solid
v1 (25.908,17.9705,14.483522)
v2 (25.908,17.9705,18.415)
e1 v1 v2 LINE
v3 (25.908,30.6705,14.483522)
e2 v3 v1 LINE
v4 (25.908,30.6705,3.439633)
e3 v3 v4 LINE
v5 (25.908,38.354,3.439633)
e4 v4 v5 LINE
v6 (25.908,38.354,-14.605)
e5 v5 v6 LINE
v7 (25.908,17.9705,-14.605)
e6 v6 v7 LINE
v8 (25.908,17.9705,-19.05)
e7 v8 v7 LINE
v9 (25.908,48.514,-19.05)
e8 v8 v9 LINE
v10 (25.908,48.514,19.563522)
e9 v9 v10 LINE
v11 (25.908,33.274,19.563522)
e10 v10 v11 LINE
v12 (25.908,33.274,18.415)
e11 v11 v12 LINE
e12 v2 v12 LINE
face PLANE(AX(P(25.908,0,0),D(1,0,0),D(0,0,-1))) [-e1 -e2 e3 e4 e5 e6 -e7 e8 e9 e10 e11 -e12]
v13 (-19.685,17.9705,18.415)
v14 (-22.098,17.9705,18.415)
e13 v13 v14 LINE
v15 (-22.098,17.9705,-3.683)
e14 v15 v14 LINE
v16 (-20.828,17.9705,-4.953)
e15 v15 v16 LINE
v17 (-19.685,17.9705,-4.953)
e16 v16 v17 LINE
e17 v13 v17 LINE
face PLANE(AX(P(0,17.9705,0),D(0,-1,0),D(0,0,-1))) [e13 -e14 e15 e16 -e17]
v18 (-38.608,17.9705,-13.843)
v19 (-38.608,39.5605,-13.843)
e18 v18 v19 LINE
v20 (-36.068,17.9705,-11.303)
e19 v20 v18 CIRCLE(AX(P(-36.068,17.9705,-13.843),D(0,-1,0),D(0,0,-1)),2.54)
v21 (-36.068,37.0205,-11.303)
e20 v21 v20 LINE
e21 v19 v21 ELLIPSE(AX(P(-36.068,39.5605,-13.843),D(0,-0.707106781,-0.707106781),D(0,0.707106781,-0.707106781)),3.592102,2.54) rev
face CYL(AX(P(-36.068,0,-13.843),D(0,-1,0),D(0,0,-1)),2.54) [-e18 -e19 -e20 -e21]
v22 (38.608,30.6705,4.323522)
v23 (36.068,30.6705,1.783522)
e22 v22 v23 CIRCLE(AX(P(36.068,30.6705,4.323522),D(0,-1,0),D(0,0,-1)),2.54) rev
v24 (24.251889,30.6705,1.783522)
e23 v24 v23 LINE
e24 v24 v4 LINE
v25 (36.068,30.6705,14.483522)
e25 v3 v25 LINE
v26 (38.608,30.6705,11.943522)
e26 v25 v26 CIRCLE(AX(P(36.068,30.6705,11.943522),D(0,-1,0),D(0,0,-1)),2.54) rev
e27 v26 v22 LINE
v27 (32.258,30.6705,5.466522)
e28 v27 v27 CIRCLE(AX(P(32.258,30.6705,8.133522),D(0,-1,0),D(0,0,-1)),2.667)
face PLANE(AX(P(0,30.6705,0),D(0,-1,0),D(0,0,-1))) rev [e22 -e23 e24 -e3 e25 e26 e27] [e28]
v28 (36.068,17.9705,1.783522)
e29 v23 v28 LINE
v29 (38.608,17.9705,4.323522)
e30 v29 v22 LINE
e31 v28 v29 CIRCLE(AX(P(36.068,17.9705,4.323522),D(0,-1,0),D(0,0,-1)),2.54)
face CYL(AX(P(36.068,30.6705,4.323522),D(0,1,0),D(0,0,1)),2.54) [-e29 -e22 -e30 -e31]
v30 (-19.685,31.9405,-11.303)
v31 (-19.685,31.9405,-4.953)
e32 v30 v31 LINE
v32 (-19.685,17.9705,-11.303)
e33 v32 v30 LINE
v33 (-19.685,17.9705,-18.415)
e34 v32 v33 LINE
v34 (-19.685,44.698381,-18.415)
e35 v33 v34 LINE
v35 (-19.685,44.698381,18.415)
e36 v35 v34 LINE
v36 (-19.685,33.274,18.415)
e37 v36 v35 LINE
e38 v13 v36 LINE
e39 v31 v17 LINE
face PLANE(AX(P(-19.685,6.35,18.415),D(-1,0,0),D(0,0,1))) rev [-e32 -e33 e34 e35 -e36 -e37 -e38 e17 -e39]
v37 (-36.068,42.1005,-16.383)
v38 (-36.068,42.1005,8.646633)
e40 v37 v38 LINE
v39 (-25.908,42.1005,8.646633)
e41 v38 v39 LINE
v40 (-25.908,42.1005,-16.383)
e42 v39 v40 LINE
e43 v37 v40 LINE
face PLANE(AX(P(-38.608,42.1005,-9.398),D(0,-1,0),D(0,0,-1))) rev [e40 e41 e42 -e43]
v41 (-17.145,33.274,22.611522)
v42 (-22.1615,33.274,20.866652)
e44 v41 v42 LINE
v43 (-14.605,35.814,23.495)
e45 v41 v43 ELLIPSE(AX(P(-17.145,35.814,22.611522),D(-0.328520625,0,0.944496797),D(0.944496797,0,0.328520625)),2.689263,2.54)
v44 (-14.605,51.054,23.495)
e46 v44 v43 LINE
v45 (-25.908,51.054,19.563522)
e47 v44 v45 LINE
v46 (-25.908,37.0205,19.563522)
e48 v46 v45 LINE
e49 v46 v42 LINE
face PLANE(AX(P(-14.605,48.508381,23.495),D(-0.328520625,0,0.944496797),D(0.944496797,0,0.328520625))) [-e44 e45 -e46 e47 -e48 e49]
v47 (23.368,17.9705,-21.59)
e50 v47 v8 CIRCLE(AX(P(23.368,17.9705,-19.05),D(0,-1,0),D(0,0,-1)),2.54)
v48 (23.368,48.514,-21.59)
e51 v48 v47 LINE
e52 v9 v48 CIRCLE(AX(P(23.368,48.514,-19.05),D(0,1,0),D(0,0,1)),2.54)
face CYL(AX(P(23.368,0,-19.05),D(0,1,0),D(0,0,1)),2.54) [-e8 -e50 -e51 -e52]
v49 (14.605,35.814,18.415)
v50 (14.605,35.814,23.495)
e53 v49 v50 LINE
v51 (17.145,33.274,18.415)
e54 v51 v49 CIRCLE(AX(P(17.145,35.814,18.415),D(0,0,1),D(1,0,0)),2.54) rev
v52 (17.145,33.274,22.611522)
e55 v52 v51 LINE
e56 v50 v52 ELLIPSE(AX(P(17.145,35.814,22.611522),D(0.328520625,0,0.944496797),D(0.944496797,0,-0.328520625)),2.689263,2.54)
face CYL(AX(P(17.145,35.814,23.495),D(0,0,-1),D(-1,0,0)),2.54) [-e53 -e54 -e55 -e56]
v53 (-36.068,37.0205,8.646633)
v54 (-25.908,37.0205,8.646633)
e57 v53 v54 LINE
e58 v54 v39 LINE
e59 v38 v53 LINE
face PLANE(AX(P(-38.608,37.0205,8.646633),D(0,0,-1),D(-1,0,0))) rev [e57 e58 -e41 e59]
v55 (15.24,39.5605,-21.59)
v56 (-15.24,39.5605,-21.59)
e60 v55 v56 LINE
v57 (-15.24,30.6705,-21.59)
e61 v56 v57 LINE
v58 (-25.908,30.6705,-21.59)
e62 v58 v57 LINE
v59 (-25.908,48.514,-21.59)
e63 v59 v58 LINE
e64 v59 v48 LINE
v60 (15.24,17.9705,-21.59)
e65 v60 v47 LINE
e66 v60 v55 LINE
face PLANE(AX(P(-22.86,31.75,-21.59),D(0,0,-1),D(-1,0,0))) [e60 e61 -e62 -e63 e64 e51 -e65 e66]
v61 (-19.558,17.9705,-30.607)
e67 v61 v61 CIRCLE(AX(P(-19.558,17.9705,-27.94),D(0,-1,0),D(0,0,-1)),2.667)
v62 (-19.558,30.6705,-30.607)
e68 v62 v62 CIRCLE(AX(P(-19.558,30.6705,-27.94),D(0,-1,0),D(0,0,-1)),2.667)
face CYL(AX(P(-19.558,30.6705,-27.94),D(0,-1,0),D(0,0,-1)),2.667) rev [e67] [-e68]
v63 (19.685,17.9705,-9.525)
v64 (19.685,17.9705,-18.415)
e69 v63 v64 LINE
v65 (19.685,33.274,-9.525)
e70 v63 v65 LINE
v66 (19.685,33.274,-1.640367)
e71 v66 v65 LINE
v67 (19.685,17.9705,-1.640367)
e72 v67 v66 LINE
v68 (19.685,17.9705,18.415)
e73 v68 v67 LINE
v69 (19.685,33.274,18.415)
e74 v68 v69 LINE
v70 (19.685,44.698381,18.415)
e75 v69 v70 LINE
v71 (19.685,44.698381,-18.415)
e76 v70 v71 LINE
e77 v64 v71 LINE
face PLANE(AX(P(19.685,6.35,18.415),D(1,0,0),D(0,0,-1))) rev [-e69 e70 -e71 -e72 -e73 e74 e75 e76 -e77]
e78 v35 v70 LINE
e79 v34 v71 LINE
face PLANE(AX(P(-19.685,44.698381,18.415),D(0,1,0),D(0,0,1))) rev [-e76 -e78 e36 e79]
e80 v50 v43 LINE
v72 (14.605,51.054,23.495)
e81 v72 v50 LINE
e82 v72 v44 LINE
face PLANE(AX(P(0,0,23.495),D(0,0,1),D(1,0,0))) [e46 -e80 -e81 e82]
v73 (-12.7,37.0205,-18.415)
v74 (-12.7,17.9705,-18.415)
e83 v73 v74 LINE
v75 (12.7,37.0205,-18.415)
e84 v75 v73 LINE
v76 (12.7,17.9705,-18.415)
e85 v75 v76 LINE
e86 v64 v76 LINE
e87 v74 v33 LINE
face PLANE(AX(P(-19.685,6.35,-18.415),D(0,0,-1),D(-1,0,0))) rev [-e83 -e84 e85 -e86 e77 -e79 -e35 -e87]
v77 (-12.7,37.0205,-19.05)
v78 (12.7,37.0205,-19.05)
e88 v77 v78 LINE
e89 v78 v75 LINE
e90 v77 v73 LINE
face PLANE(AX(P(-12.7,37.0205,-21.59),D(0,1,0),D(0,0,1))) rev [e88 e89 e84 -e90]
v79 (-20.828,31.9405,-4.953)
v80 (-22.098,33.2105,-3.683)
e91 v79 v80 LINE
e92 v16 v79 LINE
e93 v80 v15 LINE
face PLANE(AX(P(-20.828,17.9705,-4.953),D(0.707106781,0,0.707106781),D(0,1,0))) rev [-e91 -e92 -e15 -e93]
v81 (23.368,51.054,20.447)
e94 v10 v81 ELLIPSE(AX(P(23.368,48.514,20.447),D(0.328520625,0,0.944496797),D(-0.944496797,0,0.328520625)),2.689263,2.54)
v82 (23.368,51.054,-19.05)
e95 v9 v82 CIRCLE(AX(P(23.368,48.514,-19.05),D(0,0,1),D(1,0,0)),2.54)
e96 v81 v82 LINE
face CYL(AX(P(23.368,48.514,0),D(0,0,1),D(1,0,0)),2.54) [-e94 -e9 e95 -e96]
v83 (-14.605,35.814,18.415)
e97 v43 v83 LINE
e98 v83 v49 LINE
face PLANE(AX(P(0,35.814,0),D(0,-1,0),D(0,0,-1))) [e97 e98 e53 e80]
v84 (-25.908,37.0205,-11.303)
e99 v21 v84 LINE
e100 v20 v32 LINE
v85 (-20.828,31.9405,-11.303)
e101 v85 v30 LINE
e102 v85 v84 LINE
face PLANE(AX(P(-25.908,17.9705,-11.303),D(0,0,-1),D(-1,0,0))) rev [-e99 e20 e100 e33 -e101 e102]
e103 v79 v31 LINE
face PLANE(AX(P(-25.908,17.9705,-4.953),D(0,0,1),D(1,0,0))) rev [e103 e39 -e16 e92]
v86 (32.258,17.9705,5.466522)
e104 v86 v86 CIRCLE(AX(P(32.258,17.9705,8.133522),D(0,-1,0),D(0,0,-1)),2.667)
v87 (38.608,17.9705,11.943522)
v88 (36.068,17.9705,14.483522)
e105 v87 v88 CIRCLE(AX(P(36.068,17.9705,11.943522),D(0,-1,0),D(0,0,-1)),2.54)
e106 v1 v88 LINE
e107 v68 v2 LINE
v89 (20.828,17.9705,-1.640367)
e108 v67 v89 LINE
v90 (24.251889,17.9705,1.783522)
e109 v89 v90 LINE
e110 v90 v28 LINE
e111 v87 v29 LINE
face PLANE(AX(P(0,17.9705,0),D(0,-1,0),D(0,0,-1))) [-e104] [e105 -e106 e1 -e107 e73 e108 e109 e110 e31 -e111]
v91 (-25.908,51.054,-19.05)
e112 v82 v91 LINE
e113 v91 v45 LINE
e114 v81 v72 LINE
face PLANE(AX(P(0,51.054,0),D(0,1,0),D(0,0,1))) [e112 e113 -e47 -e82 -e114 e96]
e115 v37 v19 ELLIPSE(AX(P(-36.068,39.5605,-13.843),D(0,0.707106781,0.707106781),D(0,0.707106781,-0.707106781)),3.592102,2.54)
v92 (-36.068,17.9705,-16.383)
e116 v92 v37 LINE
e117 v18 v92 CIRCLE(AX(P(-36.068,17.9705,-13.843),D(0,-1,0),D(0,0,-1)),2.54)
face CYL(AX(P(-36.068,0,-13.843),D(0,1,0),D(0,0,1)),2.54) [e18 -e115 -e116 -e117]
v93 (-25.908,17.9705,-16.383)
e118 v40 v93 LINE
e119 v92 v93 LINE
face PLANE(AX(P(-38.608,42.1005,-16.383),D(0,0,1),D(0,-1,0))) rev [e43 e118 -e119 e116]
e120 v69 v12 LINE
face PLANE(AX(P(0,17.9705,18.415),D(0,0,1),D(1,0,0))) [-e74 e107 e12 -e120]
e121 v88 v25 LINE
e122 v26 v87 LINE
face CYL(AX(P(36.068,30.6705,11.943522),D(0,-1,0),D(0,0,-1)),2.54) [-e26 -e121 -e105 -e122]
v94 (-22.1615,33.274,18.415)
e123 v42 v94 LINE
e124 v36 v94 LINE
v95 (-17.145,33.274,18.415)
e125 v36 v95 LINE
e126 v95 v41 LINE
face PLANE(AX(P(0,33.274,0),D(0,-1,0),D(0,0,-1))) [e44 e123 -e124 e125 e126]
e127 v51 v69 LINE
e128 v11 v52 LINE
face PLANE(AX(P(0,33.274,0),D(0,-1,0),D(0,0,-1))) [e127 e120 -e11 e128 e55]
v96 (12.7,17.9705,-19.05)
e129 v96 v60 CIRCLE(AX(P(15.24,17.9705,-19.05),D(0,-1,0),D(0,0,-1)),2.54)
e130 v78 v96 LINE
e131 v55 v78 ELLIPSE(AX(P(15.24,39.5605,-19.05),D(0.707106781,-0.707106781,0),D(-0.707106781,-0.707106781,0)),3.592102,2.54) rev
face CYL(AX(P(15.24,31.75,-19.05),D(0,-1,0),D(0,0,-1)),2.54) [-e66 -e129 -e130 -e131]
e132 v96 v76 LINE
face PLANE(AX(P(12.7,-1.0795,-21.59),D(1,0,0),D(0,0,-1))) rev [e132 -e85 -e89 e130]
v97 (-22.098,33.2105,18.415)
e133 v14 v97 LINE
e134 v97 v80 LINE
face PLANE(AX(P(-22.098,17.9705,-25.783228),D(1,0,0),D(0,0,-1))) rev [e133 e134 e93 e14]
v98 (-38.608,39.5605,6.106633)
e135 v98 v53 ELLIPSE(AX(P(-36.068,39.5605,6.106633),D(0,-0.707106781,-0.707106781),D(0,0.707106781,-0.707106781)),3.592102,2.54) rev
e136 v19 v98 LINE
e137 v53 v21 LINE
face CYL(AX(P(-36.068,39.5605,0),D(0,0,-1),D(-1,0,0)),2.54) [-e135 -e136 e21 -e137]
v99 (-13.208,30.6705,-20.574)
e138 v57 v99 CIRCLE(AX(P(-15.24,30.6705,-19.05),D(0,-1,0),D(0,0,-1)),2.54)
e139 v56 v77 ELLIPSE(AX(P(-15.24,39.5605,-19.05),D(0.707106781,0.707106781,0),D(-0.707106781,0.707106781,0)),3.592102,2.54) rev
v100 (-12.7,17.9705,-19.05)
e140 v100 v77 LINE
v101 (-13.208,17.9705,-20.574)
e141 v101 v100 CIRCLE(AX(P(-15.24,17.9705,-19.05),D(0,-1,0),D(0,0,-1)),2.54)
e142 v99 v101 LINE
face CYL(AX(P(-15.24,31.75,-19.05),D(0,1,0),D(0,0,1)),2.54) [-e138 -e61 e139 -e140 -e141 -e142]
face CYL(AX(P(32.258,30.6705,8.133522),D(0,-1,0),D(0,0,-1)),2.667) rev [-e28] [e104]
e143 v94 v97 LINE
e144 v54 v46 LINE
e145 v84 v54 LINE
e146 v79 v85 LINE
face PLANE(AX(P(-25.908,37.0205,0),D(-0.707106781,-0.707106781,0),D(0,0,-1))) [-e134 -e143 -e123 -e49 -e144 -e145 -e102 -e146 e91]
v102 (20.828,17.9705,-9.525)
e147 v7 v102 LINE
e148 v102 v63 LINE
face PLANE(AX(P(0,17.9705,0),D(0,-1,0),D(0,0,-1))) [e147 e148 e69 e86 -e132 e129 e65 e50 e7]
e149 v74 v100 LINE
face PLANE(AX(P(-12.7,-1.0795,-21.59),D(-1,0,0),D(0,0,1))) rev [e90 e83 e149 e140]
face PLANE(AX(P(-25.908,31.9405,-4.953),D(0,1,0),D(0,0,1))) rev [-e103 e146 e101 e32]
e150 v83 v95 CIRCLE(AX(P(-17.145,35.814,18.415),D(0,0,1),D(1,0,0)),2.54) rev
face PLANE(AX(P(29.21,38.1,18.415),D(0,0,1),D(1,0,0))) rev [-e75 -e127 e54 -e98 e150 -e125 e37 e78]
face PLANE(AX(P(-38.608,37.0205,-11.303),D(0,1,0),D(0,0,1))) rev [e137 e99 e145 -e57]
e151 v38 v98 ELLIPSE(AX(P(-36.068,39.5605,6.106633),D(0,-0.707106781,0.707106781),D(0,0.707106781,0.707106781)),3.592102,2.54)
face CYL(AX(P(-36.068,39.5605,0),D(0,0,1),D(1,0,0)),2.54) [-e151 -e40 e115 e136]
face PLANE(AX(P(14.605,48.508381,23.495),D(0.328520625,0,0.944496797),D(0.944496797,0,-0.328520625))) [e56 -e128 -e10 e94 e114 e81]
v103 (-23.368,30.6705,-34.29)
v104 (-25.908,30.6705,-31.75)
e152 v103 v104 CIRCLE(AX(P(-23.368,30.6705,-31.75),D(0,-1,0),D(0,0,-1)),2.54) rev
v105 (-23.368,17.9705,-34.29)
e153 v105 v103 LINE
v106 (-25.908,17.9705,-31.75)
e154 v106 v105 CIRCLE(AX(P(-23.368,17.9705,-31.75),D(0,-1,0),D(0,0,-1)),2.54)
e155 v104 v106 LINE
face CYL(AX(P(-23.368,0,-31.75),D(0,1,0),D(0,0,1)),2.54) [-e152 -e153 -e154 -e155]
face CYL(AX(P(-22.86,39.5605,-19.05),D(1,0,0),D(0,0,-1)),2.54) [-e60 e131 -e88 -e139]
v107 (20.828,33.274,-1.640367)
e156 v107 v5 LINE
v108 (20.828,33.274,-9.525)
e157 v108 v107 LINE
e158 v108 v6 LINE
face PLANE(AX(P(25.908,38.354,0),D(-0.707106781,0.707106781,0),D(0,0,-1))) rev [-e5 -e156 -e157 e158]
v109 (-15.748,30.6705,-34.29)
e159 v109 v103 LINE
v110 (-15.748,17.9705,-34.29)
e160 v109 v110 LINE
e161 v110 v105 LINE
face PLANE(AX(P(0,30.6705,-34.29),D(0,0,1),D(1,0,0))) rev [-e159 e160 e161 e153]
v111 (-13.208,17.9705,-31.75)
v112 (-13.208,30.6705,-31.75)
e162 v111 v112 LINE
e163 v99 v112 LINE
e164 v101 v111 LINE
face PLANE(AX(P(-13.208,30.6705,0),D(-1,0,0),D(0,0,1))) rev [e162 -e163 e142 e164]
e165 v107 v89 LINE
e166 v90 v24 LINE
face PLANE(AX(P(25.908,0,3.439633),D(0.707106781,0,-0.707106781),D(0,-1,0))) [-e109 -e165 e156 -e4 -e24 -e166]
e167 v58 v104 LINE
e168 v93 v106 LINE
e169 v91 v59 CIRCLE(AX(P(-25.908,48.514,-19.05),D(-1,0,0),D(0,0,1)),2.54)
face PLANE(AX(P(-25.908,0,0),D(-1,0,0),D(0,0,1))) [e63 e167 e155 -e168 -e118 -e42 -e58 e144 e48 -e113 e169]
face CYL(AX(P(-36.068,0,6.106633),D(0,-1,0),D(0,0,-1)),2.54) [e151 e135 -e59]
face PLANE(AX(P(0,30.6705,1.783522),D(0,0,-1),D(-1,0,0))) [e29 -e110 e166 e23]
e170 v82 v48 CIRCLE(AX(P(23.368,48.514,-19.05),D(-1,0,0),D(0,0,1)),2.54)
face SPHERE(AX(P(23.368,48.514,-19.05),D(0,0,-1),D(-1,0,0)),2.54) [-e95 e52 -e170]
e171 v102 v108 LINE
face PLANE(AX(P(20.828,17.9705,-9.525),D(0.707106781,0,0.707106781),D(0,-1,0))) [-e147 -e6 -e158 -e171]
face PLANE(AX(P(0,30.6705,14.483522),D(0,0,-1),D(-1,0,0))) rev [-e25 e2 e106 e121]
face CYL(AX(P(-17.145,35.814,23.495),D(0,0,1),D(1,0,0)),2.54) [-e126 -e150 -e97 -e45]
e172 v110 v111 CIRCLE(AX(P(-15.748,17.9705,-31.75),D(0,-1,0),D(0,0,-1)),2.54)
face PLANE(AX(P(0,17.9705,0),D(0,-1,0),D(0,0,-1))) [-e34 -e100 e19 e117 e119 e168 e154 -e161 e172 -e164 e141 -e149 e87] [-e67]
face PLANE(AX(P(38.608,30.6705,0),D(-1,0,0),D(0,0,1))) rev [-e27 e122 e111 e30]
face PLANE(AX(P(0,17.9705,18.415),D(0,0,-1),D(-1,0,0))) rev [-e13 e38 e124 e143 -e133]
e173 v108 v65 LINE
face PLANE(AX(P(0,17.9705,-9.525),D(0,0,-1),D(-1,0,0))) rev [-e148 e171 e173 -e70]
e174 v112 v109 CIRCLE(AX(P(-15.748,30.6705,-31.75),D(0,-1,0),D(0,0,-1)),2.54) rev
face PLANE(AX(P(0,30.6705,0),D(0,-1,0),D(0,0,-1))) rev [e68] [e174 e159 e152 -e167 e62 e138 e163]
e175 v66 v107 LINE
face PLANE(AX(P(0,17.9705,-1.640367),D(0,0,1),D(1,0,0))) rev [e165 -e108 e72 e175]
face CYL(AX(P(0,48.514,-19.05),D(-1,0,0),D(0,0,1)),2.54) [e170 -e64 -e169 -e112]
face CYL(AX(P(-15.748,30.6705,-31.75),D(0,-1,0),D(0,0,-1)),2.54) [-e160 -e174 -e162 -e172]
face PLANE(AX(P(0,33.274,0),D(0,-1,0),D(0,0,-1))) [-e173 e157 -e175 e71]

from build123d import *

# Parameters (mm, degrees)
SKETCH1_W            = 45.72
SKETCH1_H            = 43.18
BOSS_EXTRUDE1_DEPTH  = 31.75
SKETCH2_W            = 39.37
SKETCH2_H            = 36.83
CUT_EXTRUDE3_DEPTH   = 25.4
SKETCH3_W            = 45.72
SKETCH3_H            = 31.75
CUT_EXTRUDE5_DEPTH   = 3.175
BOSS_EXTRUDE4_DEPTH  = 38.1
SKETCH7_W            = 39.37
SKETCH7_H            = 25.151618727
BOSS_EXTRUDE5_DEPTH  = 36.83
SKETCH8_W            = 40.005
SKETCH8_H            = 69.85
BOSS_EXTRUDE6_DEPTH  = 6.35
SKETCH9_W            = 40.005
SKETCH9_H            = 69.85
BOSS_EXTRUDE7_DEPTH  = 6.35
CUT_EXTRUDE8_DEPTH   = 61.468
SKETCH13_W           = 58.42
SKETCH13_H           = 26.3525
BOSS_EXTRUDE8_DEPTH  = 16.002
CUT_EXTRUDE9_DEPTH   = 16.51
SKETCH15_W           = 37.994827887
SKETCH15_H           = 16.002
BOSS_EXTRUDE9_DEPTH  = 5.08
SKETCH16_W           = 58.42
SKETCH16_H           = 40.005
CUT_EXTRUDE11_DEPTH  = 38.1
SKETCH17_W           = 9.525
SKETCH17_H           = 12.7
BOSS_EXTRUDE10_DEPTH = 13.97
SKETCH18_W           = 9.525
SKETCH18_H           = 12.7
BOSS_EXTRUDE11_DEPTH = 13.97
SKETCH19_W           = 39.37
SKETCH19_H           = 3.81
BOSS_EXTRUDE14_DEPTH = 5.08
CUT_EXTRUDE12_DEPTH  = 3.81
BOSS_EXTRUDE22_DEPTH = 3.809999
BOSS_EXTRUDE23_START = -1e-06
BOSS_EXTRUDE23_DEPTH = 21.34162
BOSS_EXTRUDE24_DEPTH = 6.598381
SKETCH40_W           = 39.37
SKETCH40_H           = 36.83
BOSS_EXTRUDE25_DEPTH = 4.826
SKETCH42_W           = 37.994827887
SKETCH42_H           = 16.002
BOSS_EXTRUDE26_DEPTH = 3.302
SKETCH43_W           = 39.37
SKETCH43_H           = 13.582012484
CUT_EXTRUDE13_DEPTH  = 6.35
SKETCH45_W           = 39.37
SKETCH45_H           = 13.582012484
BOSS_EXTRUDE27_DEPTH = 19.05
CUT_EXTRUDE15_DEPTH  = 3.302
CUT_EXTRUDE16_DEPTH  = 3.302
SKETCH48_W           = 3.302
SKETCH48_H           = 36.576
CUT_EXTRUDE17_DEPTH  = 3.302
SKETCH49_W           = 3.302
SKETCH49_H           = 36.576
CUT_EXTRUDE18_DEPTH  = 3.302
SKETCH50_W           = 63.22676162
SKETCH50_H           = 45.986337428
CUT_EXTRUDE19_DEPTH  = 16.002
SKETCH51_W           = 54.973573954
SKETCH51_H           = 46.584394505
CUT_EXTRUDE20_DEPTH  = 18.796
SKETCH52_W           = 6.223
SKETCH52_H           = 20.055366997
SKETCH52_H_2         = 8.89
BOSS_EXTRUDE28_DEPTH = 15.3035
SKETCH53_W           = 12.7
SKETCH53_H           = 3.81
BOSS_EXTRUDE29_DEPTH = 10.16
SKETCH54_W           = 12.7
SKETCH54_H           = 3.81
BOSS_EXTRUDE30_DEPTH = 10.16
CUT_EXTRUDE21_DEPTH  = 12.7
CUT_EXTRUDE22_DEPTH  = 12.7
SKETCH60_R           = 2.667
CUT_EXTRUDE25_DEPTH  = 10.16
SKETCH62_W           = 29.21
SKETCH62_H           = 5.08
CUT_EXTRUDE27_DEPTH  = 2.54
SKETCH63_W           = 25.4
SKETCH63_H           = 38.1
CUT_EXTRUDE28_DEPTH  = 3.175
SKETCH64_W           = 12.102561389
SKETCH64_H           = 15.659817378
SKETCH64_W_2         = 11.935696887
SKETCH64_H_2         = 14.711913551
CUT_EXTRUDE29_DEPTH  = 3.81
SKETCH65_W           = 12.7
SKETCH65_H           = 12.7
SKETCH65_R           = 2.667
BOSS_EXTRUDE31_DEPTH = 12.7
SKETCH66_W           = 6.35
SKETCH66_H           = 13.97
CUT_EXTRUDE30_DEPTH  = 85.737175224
SKETCH68_W           = 3.81
SKETCH68_H           = 13.97
CUT_EXTRUDE31_DEPTH  = 29.718
CHAMFER1_SIZE        = 5.08
BOSS_EXTRUDE32_DEPTH = 12.7
FILLET8_R            = 2.54
FILLET9_R            = 2.54
FILLET13_R           = 2.54
FILLET14_R           = 2.54
FILLET1_R            = 2.54
FILLET2_R            = 2.54
FILLET17_R           = 2.54
CHAMFER2_SIZE        = 1.27


with BuildPart() as part:
    # Sketch1 → Boss-Extrude1 (new body)
    with BuildSketch(Plane(origin=(0, 0, 0), x_dir=(1, 0, 0), z_dir=(0, 1, 0))):
        Rectangle(SKETCH1_W, SKETCH1_H)
    extrude(amount=BOSS_EXTRUDE1_DEPTH)

    # Sketch2 → Cut-Extrude3 (cut)
    with BuildSketch(Plane(origin=(0, 31.75, 0), x_dir=(1, 0, 0), z_dir=(0, 1, 0))):
        Rectangle(SKETCH2_W, SKETCH2_H)
    extrude(amount=-CUT_EXTRUDE3_DEPTH, mode=Mode.SUBTRACT)

    # Sketch3 → Cut-Extrude5 (cut)
    with BuildSketch(Plane.XY.offset(21.59)):
        with Locations((0, 15.875)):
            Rectangle(SKETCH3_W, SKETCH3_H)
    extrude(amount=-CUT_EXTRUDE5_DEPTH, mode=Mode.SUBTRACT)

    # Sketch6 → Boss-Extrude4 (add)
    with BuildSketch(Plane(origin=(0, 31.75, 0), x_dir=(1, 0, 0), z_dir=(0, 1, 0))):
        Polygon((-22.86, -18.415), (-19.685, -18.415), (-19.685, 18.415), (19.685, 18.415), (19.685, -18.415), (22.86, -18.415), (22.86, 21.59), (-22.86, 21.59), align=None)
    extrude(amount=BOSS_EXTRUDE4_DEPTH)

    # Sketch7 → Boss-Extrude5 (add)
    with BuildSketch(Plane.XY.offset(-18.415)):
        with Locations((0, 57.274190637)):
            Rectangle(SKETCH7_W, SKETCH7_H)
    extrude(amount=BOSS_EXTRUDE5_DEPTH)

    # Sketch8 → Boss-Extrude6 (add)
    with BuildSketch(Plane(origin=(22.86, 0, 0), x_dir=(0, 0, -1), z_dir=(1, 0, 0))):
        with Locations((1.5875, 34.925)):
            Rectangle(SKETCH8_W, SKETCH8_H)
    extrude(amount=BOSS_EXTRUDE6_DEPTH)

    # Sketch9 → Boss-Extrude7 (add)
    with BuildSketch(Plane.ZY.offset(22.86)):
        with Locations((-1.5875, 34.925)):
            Rectangle(SKETCH9_W, SKETCH9_H)
    extrude(amount=BOSS_EXTRUDE7_DEPTH)

    # Sketch11 → Cut-Extrude8 (cut)
    with BuildSketch(Plane.ZY.offset(29.21)):
        Polygon((4.7625, 58.280393757), (-1.5875, 58.280393757), (-7.9375, 58.280393757), (-7.9375, 44.310393757), (4.7625, 44.310393757), align=None)
    extrude(amount=-CUT_EXTRUDE8_DEPTH, mode=Mode.SUBTRACT)

    # Sketch13 → Boss-Extrude8 (add)
    with BuildSketch(Plane(origin=(0, 69.85, 0), x_dir=(1, 0, 0), z_dir=(0, 1, 0))):
        with Locations((0, 8.41375)):
            Rectangle(SKETCH13_W, SKETCH13_H)
    extrude(amount=BOSS_EXTRUDE8_DEPTH)

    # Sketch14 → Cut-Extrude9 (cut)
    with BuildSketch(Plane(origin=(0, 0, -21.59), x_dir=(-1, 0, 0), z_dir=(0, 0, -1))):
        Polygon((10.16, 85.852), (0, 85.852), (-10.16, 85.852), (-10.16, 73.175571961), (-3.81, 73.175571961), (10.16, 73.175571961), align=None)
    extrude(amount=-CUT_EXTRUDE9_DEPTH, mode=Mode.SUBTRACT)

    # Sketch15 → Boss-Extrude9 (add)
    with BuildSketch(Plane.XY.offset(4.7625)):
        with Locations((0.097658191, 77.851)):
            Rectangle(SKETCH15_W, SKETCH15_H)
    extrude(amount=BOSS_EXTRUDE9_DEPTH)

    # Sketch16 → Cut-Extrude11 (cut)
    with BuildSketch(Plane.XZ):
        with Locations((0, -1.5875)):
            Rectangle(SKETCH16_W, SKETCH16_H)
    extrude(amount=-CUT_EXTRUDE11_DEPTH, mode=Mode.SUBTRACT)

    # Sketch17 → Boss-Extrude10 (add)
    with BuildSketch(Plane(origin=(0, 44.310393757, 0), x_dir=(1, 0, 0), z_dir=(0, 1, 0))):
        with Locations((24.4475, 1.5875)):
            Rectangle(SKETCH17_W, SKETCH17_H)
    extrude(amount=BOSS_EXTRUDE10_DEPTH)

    # Sketch18 → Boss-Extrude11 (add)
    with BuildSketch(Plane(origin=(0, 44.310393757, 0), x_dir=(1, 0, 0), z_dir=(0, 1, 0))):
        with Locations((-24.4475, 1.5875)):
            Rectangle(SKETCH18_W, SKETCH18_H)
    extrude(amount=BOSS_EXTRUDE11_DEPTH)

    # Sketch19 → Boss-Extrude14 (add)
    with BuildSketch(Plane.XY.offset(18.415)):
        with Locations((0, 46.603381273)):
            Rectangle(SKETCH19_W, SKETCH19_H)
    extrude(amount=BOSS_EXTRUDE14_DEPTH)

    # Sketch21 → Cut-Extrude12 (cut)
    with BuildSketch(Plane.XZ.offset(-44.698381273)):
        Polygon((-19.685, 18.415), (-19.685, 23.495), (-14.605, 23.495), align=None)
        Polygon((19.685, 18.415), (19.685, 23.495), (14.605, 23.495), align=None)
    extrude(amount=-CUT_EXTRUDE12_DEPTH, mode=Mode.SUBTRACT)

    # Sketch36 → Boss-Extrude22 (add)
    with BuildSketch(Plane.XZ.offset(-44.698381273)):
        Polygon((-14.605, 23.495), (-29.21, 18.415), (-14.605, 18.415), align=None)
        Polygon((14.605, 23.495), (29.21, 18.415), (14.605, 18.415), align=None)
    extrude(amount=-BOSS_EXTRUDE22_DEPTH)

    # Sketch37 → Boss-Extrude23 (add)
    with BuildSketch(Plane(origin=(0, 48.508381273, 0), x_dir=(1, 0, 0), z_dir=(0, 1, 0)).offset(BOSS_EXTRUDE23_START)):
        Polygon((-29.21, -18.415), (-14.605, -23.495), (14.605, -23.495), (29.21, -18.415), align=None)
    extrude(amount=BOSS_EXTRUDE23_DEPTH)

    # Sketch39 → Boss-Extrude24 (add)
    with BuildSketch(Plane.XZ.offset(-44.698381273)):
        Polygon((-29.21, 18.415), (-14.605, 23.495), (14.605, 23.495), (29.21, 18.415), align=None)
    extrude(amount=BOSS_EXTRUDE24_DEPTH)

    # Sketch40 → Boss-Extrude25 (add)
    with BuildSketch(Plane(origin=(0, 38.1, 0), x_dir=(-1, 0, 0), z_dir=(0, -1, 0))):
        Polygon((29.21, 21.59), (-29.21, 21.59), (-29.21, -18.415), (-14.605, -23.495), (14.605, -23.495), (29.21, -18.415), align=None)
        Rectangle(SKETCH40_W, SKETCH40_H, mode=Mode.SUBTRACT)
    extrude(amount=BOSS_EXTRUDE25_DEPTH)

    # Sketch42 → Boss-Extrude26 (add)
    with BuildSketch(Plane.XY.offset(9.8425)):
        with Locations((0.097658191, 77.851)):
            Rectangle(SKETCH42_W, SKETCH42_H)
    extrude(amount=BOSS_EXTRUDE26_DEPTH)

    # Sketch43 → Cut-Extrude13 (cut)
    with BuildSketch(Plane(origin=(0, 0, 4.7625), x_dir=(-1, 0, 0), z_dir=(0, 0, -1))):
        with Locations((0, 51.489387515)):
            Rectangle(SKETCH43_W, SKETCH43_H)
    extrude(amount=-CUT_EXTRUDE13_DEPTH, mode=Mode.SUBTRACT)

    # Sketch45 → Boss-Extrude27 (add)
    with BuildSketch(Plane.XY.offset(-7.9375)):
        with Locations((0, 51.489387515)):
            Rectangle(SKETCH45_W, SKETCH45_H)
    extrude(amount=BOSS_EXTRUDE27_DEPTH)

    # Sketch46 → Cut-Extrude15 (cut)
    with BuildSketch(Plane.ZY.offset(29.21)):
        Polygon((-21.59, 85.852), (-21.59, 33.274), (18.415, 33.274), (18.415, 69.85), (13.1445, 69.85), (13.1445, 85.852), align=None)
    extrude(amount=-CUT_EXTRUDE15_DEPTH, mode=Mode.SUBTRACT)

    # Sketch47 → Cut-Extrude16 (cut)
    with BuildSketch(Plane(origin=(29.21, 0, 0), x_dir=(0, 0, -1), z_dir=(1, 0, 0))):
        Polygon((-4.7625, 85.852), (-4.7625, 69.85), (-18.415, 69.85), (-18.415, 33.274), (21.59, 33.274), (21.59, 85.852), align=None)
    extrude(amount=-CUT_EXTRUDE16_DEPTH, mode=Mode.SUBTRACT)

    # Sketch48 → Cut-Extrude17 (cut)
    with BuildSketch(Plane(origin=(0, 0, 18.415), x_dir=(-1, 0, 0), z_dir=(0, 0, -1))):
        with Locations((-27.559, 51.562)):
            Rectangle(SKETCH48_W, SKETCH48_H)
    extrude(amount=-CUT_EXTRUDE17_DEPTH, mode=Mode.SUBTRACT)

    # Sketch49 → Cut-Extrude18 (cut)
    with BuildSketch(Plane(origin=(0, 0, 18.415), x_dir=(-1, 0, 0), z_dir=(0, 0, -1))):
        with Locations((27.559, 51.562)):
            Rectangle(SKETCH49_W, SKETCH49_H)
    extrude(amount=-CUT_EXTRUDE18_DEPTH, mode=Mode.SUBTRACT)

    # Sketch50 → Cut-Extrude19 (cut)
    with BuildSketch(Plane(origin=(0, 85.852, 0), x_dir=(1, 0, 0), z_dir=(0, 1, 0))):
        with Locations((5.70538081, -1.403168714)):
            Rectangle(SKETCH50_W, SKETCH50_H)
    extrude(amount=-CUT_EXTRUDE19_DEPTH, mode=Mode.SUBTRACT)

    # Sketch51 → Cut-Extrude20 (cut)
    with BuildSketch(Plane(origin=(0, 69.85, 0), x_dir=(1, 0, 0), z_dir=(0, 1, 0))):
        with Locations((1.578786977, -1.702197253)):
            Rectangle(SKETCH51_W, SKETCH51_H)
    extrude(amount=-CUT_EXTRUDE20_DEPTH, mode=Mode.SUBTRACT)

    # Sketch52 → Boss-Extrude28 (add)
    with BuildSketch(Plane(origin=(0, 33.274, 0), x_dir=(-1, 0, 0), z_dir=(0, -1, 0))):
        with Locations((-22.7965, -8.387316502)):
            Rectangle(SKETCH52_W, SKETCH52_H)
        with Locations((-22.7965, 13.97)):
            Rectangle(SKETCH52_W, SKETCH52_H_2)
        Polygon((-25.908, 18.415), (-19.685, 18.415), (19.685, 18.415), (19.685, 21.59), (-25.908, 21.59), align=None)
        Polygon((19.685, 21.59), (19.685, 18.415), (19.685, -18.415), (25.908, -18.415), (25.908, 21.59), align=None)
    extrude(amount=BOSS_EXTRUDE28_DEPTH)

    # Sketch53 → Boss-Extrude29 (add)
    with BuildSketch(Plane(origin=(25.908, 0, 0), x_dir=(0, 0, -1), z_dir=(1, 0, 0))):
        with Locations((-12.065, 19.8755)):
            Rectangle(SKETCH53_W, SKETCH53_H)
    extrude(amount=BOSS_EXTRUDE29_DEPTH)

    # Sketch54 → Boss-Extrude30 (add)
    with BuildSketch(Plane.ZY.offset(25.908)):
        with Locations((12.065, 19.8755)):
            Rectangle(SKETCH54_W, SKETCH54_H)
    extrude(amount=BOSS_EXTRUDE30_DEPTH)

    # Sketch55 → Cut-Extrude21 (cut)
    with BuildSketch(Plane(origin=(0, 21.7805, 0), x_dir=(1, 0, 0), z_dir=(0, 1, 0))):
        with BuildLine():
            ThreePointArc((36.068, -13.335), (34.418983891, -16.765983891), (30.988, -18.415))
            Line((30.988, -18.415), (36.068, -18.415))
            Line((36.068, -18.415), (36.068, -13.335))
        make_face()
    extrude(amount=-CUT_EXTRUDE21_DEPTH, mode=Mode.SUBTRACT)

    # Sketch56 → Cut-Extrude22 (cut)
    with BuildSketch(Plane(origin=(0, 21.7805, 0), x_dir=(1, 0, 0), z_dir=(0, 1, 0))):
        with BuildLine():
            Line((-36.068, -18.415), (-30.988, -18.415))
            ThreePointArc((-30.988, -18.415), (-34.418983891, -16.765983891), (-36.068, -13.335))
            Line((-36.068, -13.335), (-36.068, -18.415))
        make_face()
    extrude(amount=-CUT_EXTRUDE22_DEPTH, mode=Mode.SUBTRACT)

    # Sketch60 → Cut-Extrude25 (cut)
    with BuildSketch(Plane(origin=(0, 21.7805, 0), x_dir=(1, 0, 0), z_dir=(0, 1, 0))):
        with Locations(Location((30.353, -12.7, 0), (0, 0, 270))):
            Circle(SKETCH60_R)
        with Locations(Location((-30.353, -12.7, 0), (0, 0, 270))):
            Circle(SKETCH60_R)
    extrude(amount=-CUT_EXTRUDE25_DEPTH, mode=Mode.SUBTRACT)

    # Sketch62 → Cut-Extrude27 (cut)
    with BuildSketch(Plane.XZ.offset(-33.274)):
        with Locations((0, 20.955)):
            Rectangle(SKETCH62_W, SKETCH62_H)
    extrude(amount=-CUT_EXTRUDE27_DEPTH, mode=Mode.SUBTRACT)

    # Sketch63 → Cut-Extrude28 (cut)
    with BuildSketch(Plane.XY.offset(-18.415)):
        with Locations((0, 17.9705)):
            Rectangle(SKETCH63_W, SKETCH63_H)
    extrude(amount=-CUT_EXTRUDE28_DEPTH, mode=Mode.SUBTRACT)

    # Sketch64 → Cut-Extrude29 (cut)
    with BuildSketch(Plane.XZ.offset(-17.9705)):
        with Locations((-31.959280695, 13.544908689)):
            Rectangle(SKETCH64_W, SKETCH64_H)
        with Locations((31.875848444, 13.070956776)):
            Rectangle(SKETCH64_W_2, SKETCH64_H_2)
    extrude(amount=-CUT_EXTRUDE29_DEPTH, mode=Mode.SUBTRACT)

    # Sketch65 → Boss-Extrude31 (add)
    # profile 1 of 2: a face of its own
    with BuildSketch(Plane.XZ.offset(-17.9705)):
        with Locations((32.258, 8.133521739)):
            Rectangle(SKETCH65_W, SKETCH65_H)
        with Locations(Location((32.258, 8.133521739, 0), (0, 0, 270))):
            Circle(SKETCH65_R, mode=Mode.SUBTRACT)
    # profile 2 of 2: a face of its own
    with BuildSketch(Plane.XZ.offset(-17.9705)):
        with Locations((-19.558, -27.94)):
            Rectangle(SKETCH65_W, SKETCH65_H)
        with Locations(Location((-19.558, -27.94, 0), (0, 0, 270))):
            Circle(SKETCH65_R, mode=Mode.SUBTRACT)
    extrude(amount=-BOSS_EXTRUDE31_DEPTH)

    # Sketch66 → Cut-Extrude30 (cut, through all)
    with BuildSketch(Plane(origin=(-19.685, 0, 0), x_dir=(0, 0, -1), z_dir=(1, 0, 0))):
        with Locations((8.128, 24.9555)):
            Rectangle(SKETCH66_W, SKETCH66_H)
    extrude(amount=-CUT_EXTRUDE30_DEPTH, mode=Mode.SUBTRACT)

    # Sketch68 → Cut-Extrude31 (cut)
    with BuildSketch(Plane.XY.offset(18.415)):
        with Locations((-24.003, 24.9555)):
            Rectangle(SKETCH68_W, SKETCH68_H)
    extrude(amount=-CUT_EXTRUDE31_DEPTH, mode=Mode.SUBTRACT)

    # Chamfer1
    chamfer1_edges = [part.edges().sort_by_distance(p)[0] for p in [
        (25.908, 33.274, -5.582683498),
        (25.908, 25.62225, -1.640366997),
        (25.908, 25.62225, -9.525),
        (-25.908, 31.9405, 3.556),
    ]]
    chamfer(chamfer1_edges, length=CHAMFER1_SIZE)

    # Sketch67 → Boss-Extrude32 (add)
    with BuildSketch(Plane.ZY.offset(25.908)):
        Polygon((-11.303, 17.9705), (-11.303, 37.0205), (8.646633003, 37.0205), (8.646633003, 42.1005), (-9.398, 42.1005), (-16.383, 42.1005), (-16.383, 17.9705), align=None)
    extrude(amount=BOSS_EXTRUDE32_DEPTH)

    # Fillet8
    fillet8_edges = [part.edges().sort_by_distance(p)[0] for p in [
        (14.605, 33.274, 20.955),
    ]]
    fillet(fillet8_edges, radius=FILLET8_R - 0.0001)  # a hair under: the kernel refuses the full size

    # Fillet9
    fillet9_edges = [part.edges().sort_by_distance(p)[0] for p in [
        (-14.605, 33.274, 20.955),
    ]]
    fillet(fillet9_edges, radius=FILLET9_R - 0.0001)  # a hair under: the kernel refuses the full size

    # Fillet13
    fillet13_edges = [part.edges().sort_by_distance(p)[0] for p in [
        (-12.7, 27.4955, -21.59),
        (12.7, 27.4955, -21.59),
        (0, 37.0205, -21.59),
    ]]
    fillet(fillet13_edges, radius=FILLET13_R)

    # Fillet14
    fillet14_edges = [part.edges().sort_by_distance(p)[0] for p in [
        (-13.208, 24.3205, -34.29),
        (-25.908, 24.3205, -34.29),
        (38.608, 24.3205, 14.483521739),
        (38.608, 24.3205, 1.783521739),
    ]]
    fillet(fillet14_edges, radius=FILLET14_R)

    # Fillet1
    fillet1_edges = [part.edges().sort_by_distance(p)[0] for p in [
        (25.908, 51.054, -1.01323913),
    ]]
    fillet(fillet1_edges, radius=FILLET1_R)

    # Fillet2
    fillet2_edges = [part.edges().sort_by_distance(p)[0] for p in [
        (25.908, 33.24225, -21.59),
        (-1.27, 51.054, -21.59),
        (25.164051224, 50.310051224, -21.59),
    ]]
    fillet(fillet2_edges, radius=FILLET2_R)

    # Fillet17
    fillet17_edges = [part.edges().sort_by_distance(p)[0] for p in [
        (-38.608, 39.5605, 8.646633003),
        (-38.608, 37.0205, -1.328183498),
        (-38.608, 42.1005, -3.868183498),
        (-38.608, 30.0355, -16.383),
        (-38.608, 27.4955, -11.303),
    ]]
    fillet(fillet17_edges, radius=FILLET17_R - 0.0001)  # a hair under: the kernel refuses the full size

    # Chamfer2
    chamfer2_edges = [part.edges().sort_by_distance(p)[0] for p in [
        (-22.098, 25.5905, -4.953),
    ]]
    chamfer(chamfer2_edges, length=CHAMFER2_SIZE)


solid = part.part
